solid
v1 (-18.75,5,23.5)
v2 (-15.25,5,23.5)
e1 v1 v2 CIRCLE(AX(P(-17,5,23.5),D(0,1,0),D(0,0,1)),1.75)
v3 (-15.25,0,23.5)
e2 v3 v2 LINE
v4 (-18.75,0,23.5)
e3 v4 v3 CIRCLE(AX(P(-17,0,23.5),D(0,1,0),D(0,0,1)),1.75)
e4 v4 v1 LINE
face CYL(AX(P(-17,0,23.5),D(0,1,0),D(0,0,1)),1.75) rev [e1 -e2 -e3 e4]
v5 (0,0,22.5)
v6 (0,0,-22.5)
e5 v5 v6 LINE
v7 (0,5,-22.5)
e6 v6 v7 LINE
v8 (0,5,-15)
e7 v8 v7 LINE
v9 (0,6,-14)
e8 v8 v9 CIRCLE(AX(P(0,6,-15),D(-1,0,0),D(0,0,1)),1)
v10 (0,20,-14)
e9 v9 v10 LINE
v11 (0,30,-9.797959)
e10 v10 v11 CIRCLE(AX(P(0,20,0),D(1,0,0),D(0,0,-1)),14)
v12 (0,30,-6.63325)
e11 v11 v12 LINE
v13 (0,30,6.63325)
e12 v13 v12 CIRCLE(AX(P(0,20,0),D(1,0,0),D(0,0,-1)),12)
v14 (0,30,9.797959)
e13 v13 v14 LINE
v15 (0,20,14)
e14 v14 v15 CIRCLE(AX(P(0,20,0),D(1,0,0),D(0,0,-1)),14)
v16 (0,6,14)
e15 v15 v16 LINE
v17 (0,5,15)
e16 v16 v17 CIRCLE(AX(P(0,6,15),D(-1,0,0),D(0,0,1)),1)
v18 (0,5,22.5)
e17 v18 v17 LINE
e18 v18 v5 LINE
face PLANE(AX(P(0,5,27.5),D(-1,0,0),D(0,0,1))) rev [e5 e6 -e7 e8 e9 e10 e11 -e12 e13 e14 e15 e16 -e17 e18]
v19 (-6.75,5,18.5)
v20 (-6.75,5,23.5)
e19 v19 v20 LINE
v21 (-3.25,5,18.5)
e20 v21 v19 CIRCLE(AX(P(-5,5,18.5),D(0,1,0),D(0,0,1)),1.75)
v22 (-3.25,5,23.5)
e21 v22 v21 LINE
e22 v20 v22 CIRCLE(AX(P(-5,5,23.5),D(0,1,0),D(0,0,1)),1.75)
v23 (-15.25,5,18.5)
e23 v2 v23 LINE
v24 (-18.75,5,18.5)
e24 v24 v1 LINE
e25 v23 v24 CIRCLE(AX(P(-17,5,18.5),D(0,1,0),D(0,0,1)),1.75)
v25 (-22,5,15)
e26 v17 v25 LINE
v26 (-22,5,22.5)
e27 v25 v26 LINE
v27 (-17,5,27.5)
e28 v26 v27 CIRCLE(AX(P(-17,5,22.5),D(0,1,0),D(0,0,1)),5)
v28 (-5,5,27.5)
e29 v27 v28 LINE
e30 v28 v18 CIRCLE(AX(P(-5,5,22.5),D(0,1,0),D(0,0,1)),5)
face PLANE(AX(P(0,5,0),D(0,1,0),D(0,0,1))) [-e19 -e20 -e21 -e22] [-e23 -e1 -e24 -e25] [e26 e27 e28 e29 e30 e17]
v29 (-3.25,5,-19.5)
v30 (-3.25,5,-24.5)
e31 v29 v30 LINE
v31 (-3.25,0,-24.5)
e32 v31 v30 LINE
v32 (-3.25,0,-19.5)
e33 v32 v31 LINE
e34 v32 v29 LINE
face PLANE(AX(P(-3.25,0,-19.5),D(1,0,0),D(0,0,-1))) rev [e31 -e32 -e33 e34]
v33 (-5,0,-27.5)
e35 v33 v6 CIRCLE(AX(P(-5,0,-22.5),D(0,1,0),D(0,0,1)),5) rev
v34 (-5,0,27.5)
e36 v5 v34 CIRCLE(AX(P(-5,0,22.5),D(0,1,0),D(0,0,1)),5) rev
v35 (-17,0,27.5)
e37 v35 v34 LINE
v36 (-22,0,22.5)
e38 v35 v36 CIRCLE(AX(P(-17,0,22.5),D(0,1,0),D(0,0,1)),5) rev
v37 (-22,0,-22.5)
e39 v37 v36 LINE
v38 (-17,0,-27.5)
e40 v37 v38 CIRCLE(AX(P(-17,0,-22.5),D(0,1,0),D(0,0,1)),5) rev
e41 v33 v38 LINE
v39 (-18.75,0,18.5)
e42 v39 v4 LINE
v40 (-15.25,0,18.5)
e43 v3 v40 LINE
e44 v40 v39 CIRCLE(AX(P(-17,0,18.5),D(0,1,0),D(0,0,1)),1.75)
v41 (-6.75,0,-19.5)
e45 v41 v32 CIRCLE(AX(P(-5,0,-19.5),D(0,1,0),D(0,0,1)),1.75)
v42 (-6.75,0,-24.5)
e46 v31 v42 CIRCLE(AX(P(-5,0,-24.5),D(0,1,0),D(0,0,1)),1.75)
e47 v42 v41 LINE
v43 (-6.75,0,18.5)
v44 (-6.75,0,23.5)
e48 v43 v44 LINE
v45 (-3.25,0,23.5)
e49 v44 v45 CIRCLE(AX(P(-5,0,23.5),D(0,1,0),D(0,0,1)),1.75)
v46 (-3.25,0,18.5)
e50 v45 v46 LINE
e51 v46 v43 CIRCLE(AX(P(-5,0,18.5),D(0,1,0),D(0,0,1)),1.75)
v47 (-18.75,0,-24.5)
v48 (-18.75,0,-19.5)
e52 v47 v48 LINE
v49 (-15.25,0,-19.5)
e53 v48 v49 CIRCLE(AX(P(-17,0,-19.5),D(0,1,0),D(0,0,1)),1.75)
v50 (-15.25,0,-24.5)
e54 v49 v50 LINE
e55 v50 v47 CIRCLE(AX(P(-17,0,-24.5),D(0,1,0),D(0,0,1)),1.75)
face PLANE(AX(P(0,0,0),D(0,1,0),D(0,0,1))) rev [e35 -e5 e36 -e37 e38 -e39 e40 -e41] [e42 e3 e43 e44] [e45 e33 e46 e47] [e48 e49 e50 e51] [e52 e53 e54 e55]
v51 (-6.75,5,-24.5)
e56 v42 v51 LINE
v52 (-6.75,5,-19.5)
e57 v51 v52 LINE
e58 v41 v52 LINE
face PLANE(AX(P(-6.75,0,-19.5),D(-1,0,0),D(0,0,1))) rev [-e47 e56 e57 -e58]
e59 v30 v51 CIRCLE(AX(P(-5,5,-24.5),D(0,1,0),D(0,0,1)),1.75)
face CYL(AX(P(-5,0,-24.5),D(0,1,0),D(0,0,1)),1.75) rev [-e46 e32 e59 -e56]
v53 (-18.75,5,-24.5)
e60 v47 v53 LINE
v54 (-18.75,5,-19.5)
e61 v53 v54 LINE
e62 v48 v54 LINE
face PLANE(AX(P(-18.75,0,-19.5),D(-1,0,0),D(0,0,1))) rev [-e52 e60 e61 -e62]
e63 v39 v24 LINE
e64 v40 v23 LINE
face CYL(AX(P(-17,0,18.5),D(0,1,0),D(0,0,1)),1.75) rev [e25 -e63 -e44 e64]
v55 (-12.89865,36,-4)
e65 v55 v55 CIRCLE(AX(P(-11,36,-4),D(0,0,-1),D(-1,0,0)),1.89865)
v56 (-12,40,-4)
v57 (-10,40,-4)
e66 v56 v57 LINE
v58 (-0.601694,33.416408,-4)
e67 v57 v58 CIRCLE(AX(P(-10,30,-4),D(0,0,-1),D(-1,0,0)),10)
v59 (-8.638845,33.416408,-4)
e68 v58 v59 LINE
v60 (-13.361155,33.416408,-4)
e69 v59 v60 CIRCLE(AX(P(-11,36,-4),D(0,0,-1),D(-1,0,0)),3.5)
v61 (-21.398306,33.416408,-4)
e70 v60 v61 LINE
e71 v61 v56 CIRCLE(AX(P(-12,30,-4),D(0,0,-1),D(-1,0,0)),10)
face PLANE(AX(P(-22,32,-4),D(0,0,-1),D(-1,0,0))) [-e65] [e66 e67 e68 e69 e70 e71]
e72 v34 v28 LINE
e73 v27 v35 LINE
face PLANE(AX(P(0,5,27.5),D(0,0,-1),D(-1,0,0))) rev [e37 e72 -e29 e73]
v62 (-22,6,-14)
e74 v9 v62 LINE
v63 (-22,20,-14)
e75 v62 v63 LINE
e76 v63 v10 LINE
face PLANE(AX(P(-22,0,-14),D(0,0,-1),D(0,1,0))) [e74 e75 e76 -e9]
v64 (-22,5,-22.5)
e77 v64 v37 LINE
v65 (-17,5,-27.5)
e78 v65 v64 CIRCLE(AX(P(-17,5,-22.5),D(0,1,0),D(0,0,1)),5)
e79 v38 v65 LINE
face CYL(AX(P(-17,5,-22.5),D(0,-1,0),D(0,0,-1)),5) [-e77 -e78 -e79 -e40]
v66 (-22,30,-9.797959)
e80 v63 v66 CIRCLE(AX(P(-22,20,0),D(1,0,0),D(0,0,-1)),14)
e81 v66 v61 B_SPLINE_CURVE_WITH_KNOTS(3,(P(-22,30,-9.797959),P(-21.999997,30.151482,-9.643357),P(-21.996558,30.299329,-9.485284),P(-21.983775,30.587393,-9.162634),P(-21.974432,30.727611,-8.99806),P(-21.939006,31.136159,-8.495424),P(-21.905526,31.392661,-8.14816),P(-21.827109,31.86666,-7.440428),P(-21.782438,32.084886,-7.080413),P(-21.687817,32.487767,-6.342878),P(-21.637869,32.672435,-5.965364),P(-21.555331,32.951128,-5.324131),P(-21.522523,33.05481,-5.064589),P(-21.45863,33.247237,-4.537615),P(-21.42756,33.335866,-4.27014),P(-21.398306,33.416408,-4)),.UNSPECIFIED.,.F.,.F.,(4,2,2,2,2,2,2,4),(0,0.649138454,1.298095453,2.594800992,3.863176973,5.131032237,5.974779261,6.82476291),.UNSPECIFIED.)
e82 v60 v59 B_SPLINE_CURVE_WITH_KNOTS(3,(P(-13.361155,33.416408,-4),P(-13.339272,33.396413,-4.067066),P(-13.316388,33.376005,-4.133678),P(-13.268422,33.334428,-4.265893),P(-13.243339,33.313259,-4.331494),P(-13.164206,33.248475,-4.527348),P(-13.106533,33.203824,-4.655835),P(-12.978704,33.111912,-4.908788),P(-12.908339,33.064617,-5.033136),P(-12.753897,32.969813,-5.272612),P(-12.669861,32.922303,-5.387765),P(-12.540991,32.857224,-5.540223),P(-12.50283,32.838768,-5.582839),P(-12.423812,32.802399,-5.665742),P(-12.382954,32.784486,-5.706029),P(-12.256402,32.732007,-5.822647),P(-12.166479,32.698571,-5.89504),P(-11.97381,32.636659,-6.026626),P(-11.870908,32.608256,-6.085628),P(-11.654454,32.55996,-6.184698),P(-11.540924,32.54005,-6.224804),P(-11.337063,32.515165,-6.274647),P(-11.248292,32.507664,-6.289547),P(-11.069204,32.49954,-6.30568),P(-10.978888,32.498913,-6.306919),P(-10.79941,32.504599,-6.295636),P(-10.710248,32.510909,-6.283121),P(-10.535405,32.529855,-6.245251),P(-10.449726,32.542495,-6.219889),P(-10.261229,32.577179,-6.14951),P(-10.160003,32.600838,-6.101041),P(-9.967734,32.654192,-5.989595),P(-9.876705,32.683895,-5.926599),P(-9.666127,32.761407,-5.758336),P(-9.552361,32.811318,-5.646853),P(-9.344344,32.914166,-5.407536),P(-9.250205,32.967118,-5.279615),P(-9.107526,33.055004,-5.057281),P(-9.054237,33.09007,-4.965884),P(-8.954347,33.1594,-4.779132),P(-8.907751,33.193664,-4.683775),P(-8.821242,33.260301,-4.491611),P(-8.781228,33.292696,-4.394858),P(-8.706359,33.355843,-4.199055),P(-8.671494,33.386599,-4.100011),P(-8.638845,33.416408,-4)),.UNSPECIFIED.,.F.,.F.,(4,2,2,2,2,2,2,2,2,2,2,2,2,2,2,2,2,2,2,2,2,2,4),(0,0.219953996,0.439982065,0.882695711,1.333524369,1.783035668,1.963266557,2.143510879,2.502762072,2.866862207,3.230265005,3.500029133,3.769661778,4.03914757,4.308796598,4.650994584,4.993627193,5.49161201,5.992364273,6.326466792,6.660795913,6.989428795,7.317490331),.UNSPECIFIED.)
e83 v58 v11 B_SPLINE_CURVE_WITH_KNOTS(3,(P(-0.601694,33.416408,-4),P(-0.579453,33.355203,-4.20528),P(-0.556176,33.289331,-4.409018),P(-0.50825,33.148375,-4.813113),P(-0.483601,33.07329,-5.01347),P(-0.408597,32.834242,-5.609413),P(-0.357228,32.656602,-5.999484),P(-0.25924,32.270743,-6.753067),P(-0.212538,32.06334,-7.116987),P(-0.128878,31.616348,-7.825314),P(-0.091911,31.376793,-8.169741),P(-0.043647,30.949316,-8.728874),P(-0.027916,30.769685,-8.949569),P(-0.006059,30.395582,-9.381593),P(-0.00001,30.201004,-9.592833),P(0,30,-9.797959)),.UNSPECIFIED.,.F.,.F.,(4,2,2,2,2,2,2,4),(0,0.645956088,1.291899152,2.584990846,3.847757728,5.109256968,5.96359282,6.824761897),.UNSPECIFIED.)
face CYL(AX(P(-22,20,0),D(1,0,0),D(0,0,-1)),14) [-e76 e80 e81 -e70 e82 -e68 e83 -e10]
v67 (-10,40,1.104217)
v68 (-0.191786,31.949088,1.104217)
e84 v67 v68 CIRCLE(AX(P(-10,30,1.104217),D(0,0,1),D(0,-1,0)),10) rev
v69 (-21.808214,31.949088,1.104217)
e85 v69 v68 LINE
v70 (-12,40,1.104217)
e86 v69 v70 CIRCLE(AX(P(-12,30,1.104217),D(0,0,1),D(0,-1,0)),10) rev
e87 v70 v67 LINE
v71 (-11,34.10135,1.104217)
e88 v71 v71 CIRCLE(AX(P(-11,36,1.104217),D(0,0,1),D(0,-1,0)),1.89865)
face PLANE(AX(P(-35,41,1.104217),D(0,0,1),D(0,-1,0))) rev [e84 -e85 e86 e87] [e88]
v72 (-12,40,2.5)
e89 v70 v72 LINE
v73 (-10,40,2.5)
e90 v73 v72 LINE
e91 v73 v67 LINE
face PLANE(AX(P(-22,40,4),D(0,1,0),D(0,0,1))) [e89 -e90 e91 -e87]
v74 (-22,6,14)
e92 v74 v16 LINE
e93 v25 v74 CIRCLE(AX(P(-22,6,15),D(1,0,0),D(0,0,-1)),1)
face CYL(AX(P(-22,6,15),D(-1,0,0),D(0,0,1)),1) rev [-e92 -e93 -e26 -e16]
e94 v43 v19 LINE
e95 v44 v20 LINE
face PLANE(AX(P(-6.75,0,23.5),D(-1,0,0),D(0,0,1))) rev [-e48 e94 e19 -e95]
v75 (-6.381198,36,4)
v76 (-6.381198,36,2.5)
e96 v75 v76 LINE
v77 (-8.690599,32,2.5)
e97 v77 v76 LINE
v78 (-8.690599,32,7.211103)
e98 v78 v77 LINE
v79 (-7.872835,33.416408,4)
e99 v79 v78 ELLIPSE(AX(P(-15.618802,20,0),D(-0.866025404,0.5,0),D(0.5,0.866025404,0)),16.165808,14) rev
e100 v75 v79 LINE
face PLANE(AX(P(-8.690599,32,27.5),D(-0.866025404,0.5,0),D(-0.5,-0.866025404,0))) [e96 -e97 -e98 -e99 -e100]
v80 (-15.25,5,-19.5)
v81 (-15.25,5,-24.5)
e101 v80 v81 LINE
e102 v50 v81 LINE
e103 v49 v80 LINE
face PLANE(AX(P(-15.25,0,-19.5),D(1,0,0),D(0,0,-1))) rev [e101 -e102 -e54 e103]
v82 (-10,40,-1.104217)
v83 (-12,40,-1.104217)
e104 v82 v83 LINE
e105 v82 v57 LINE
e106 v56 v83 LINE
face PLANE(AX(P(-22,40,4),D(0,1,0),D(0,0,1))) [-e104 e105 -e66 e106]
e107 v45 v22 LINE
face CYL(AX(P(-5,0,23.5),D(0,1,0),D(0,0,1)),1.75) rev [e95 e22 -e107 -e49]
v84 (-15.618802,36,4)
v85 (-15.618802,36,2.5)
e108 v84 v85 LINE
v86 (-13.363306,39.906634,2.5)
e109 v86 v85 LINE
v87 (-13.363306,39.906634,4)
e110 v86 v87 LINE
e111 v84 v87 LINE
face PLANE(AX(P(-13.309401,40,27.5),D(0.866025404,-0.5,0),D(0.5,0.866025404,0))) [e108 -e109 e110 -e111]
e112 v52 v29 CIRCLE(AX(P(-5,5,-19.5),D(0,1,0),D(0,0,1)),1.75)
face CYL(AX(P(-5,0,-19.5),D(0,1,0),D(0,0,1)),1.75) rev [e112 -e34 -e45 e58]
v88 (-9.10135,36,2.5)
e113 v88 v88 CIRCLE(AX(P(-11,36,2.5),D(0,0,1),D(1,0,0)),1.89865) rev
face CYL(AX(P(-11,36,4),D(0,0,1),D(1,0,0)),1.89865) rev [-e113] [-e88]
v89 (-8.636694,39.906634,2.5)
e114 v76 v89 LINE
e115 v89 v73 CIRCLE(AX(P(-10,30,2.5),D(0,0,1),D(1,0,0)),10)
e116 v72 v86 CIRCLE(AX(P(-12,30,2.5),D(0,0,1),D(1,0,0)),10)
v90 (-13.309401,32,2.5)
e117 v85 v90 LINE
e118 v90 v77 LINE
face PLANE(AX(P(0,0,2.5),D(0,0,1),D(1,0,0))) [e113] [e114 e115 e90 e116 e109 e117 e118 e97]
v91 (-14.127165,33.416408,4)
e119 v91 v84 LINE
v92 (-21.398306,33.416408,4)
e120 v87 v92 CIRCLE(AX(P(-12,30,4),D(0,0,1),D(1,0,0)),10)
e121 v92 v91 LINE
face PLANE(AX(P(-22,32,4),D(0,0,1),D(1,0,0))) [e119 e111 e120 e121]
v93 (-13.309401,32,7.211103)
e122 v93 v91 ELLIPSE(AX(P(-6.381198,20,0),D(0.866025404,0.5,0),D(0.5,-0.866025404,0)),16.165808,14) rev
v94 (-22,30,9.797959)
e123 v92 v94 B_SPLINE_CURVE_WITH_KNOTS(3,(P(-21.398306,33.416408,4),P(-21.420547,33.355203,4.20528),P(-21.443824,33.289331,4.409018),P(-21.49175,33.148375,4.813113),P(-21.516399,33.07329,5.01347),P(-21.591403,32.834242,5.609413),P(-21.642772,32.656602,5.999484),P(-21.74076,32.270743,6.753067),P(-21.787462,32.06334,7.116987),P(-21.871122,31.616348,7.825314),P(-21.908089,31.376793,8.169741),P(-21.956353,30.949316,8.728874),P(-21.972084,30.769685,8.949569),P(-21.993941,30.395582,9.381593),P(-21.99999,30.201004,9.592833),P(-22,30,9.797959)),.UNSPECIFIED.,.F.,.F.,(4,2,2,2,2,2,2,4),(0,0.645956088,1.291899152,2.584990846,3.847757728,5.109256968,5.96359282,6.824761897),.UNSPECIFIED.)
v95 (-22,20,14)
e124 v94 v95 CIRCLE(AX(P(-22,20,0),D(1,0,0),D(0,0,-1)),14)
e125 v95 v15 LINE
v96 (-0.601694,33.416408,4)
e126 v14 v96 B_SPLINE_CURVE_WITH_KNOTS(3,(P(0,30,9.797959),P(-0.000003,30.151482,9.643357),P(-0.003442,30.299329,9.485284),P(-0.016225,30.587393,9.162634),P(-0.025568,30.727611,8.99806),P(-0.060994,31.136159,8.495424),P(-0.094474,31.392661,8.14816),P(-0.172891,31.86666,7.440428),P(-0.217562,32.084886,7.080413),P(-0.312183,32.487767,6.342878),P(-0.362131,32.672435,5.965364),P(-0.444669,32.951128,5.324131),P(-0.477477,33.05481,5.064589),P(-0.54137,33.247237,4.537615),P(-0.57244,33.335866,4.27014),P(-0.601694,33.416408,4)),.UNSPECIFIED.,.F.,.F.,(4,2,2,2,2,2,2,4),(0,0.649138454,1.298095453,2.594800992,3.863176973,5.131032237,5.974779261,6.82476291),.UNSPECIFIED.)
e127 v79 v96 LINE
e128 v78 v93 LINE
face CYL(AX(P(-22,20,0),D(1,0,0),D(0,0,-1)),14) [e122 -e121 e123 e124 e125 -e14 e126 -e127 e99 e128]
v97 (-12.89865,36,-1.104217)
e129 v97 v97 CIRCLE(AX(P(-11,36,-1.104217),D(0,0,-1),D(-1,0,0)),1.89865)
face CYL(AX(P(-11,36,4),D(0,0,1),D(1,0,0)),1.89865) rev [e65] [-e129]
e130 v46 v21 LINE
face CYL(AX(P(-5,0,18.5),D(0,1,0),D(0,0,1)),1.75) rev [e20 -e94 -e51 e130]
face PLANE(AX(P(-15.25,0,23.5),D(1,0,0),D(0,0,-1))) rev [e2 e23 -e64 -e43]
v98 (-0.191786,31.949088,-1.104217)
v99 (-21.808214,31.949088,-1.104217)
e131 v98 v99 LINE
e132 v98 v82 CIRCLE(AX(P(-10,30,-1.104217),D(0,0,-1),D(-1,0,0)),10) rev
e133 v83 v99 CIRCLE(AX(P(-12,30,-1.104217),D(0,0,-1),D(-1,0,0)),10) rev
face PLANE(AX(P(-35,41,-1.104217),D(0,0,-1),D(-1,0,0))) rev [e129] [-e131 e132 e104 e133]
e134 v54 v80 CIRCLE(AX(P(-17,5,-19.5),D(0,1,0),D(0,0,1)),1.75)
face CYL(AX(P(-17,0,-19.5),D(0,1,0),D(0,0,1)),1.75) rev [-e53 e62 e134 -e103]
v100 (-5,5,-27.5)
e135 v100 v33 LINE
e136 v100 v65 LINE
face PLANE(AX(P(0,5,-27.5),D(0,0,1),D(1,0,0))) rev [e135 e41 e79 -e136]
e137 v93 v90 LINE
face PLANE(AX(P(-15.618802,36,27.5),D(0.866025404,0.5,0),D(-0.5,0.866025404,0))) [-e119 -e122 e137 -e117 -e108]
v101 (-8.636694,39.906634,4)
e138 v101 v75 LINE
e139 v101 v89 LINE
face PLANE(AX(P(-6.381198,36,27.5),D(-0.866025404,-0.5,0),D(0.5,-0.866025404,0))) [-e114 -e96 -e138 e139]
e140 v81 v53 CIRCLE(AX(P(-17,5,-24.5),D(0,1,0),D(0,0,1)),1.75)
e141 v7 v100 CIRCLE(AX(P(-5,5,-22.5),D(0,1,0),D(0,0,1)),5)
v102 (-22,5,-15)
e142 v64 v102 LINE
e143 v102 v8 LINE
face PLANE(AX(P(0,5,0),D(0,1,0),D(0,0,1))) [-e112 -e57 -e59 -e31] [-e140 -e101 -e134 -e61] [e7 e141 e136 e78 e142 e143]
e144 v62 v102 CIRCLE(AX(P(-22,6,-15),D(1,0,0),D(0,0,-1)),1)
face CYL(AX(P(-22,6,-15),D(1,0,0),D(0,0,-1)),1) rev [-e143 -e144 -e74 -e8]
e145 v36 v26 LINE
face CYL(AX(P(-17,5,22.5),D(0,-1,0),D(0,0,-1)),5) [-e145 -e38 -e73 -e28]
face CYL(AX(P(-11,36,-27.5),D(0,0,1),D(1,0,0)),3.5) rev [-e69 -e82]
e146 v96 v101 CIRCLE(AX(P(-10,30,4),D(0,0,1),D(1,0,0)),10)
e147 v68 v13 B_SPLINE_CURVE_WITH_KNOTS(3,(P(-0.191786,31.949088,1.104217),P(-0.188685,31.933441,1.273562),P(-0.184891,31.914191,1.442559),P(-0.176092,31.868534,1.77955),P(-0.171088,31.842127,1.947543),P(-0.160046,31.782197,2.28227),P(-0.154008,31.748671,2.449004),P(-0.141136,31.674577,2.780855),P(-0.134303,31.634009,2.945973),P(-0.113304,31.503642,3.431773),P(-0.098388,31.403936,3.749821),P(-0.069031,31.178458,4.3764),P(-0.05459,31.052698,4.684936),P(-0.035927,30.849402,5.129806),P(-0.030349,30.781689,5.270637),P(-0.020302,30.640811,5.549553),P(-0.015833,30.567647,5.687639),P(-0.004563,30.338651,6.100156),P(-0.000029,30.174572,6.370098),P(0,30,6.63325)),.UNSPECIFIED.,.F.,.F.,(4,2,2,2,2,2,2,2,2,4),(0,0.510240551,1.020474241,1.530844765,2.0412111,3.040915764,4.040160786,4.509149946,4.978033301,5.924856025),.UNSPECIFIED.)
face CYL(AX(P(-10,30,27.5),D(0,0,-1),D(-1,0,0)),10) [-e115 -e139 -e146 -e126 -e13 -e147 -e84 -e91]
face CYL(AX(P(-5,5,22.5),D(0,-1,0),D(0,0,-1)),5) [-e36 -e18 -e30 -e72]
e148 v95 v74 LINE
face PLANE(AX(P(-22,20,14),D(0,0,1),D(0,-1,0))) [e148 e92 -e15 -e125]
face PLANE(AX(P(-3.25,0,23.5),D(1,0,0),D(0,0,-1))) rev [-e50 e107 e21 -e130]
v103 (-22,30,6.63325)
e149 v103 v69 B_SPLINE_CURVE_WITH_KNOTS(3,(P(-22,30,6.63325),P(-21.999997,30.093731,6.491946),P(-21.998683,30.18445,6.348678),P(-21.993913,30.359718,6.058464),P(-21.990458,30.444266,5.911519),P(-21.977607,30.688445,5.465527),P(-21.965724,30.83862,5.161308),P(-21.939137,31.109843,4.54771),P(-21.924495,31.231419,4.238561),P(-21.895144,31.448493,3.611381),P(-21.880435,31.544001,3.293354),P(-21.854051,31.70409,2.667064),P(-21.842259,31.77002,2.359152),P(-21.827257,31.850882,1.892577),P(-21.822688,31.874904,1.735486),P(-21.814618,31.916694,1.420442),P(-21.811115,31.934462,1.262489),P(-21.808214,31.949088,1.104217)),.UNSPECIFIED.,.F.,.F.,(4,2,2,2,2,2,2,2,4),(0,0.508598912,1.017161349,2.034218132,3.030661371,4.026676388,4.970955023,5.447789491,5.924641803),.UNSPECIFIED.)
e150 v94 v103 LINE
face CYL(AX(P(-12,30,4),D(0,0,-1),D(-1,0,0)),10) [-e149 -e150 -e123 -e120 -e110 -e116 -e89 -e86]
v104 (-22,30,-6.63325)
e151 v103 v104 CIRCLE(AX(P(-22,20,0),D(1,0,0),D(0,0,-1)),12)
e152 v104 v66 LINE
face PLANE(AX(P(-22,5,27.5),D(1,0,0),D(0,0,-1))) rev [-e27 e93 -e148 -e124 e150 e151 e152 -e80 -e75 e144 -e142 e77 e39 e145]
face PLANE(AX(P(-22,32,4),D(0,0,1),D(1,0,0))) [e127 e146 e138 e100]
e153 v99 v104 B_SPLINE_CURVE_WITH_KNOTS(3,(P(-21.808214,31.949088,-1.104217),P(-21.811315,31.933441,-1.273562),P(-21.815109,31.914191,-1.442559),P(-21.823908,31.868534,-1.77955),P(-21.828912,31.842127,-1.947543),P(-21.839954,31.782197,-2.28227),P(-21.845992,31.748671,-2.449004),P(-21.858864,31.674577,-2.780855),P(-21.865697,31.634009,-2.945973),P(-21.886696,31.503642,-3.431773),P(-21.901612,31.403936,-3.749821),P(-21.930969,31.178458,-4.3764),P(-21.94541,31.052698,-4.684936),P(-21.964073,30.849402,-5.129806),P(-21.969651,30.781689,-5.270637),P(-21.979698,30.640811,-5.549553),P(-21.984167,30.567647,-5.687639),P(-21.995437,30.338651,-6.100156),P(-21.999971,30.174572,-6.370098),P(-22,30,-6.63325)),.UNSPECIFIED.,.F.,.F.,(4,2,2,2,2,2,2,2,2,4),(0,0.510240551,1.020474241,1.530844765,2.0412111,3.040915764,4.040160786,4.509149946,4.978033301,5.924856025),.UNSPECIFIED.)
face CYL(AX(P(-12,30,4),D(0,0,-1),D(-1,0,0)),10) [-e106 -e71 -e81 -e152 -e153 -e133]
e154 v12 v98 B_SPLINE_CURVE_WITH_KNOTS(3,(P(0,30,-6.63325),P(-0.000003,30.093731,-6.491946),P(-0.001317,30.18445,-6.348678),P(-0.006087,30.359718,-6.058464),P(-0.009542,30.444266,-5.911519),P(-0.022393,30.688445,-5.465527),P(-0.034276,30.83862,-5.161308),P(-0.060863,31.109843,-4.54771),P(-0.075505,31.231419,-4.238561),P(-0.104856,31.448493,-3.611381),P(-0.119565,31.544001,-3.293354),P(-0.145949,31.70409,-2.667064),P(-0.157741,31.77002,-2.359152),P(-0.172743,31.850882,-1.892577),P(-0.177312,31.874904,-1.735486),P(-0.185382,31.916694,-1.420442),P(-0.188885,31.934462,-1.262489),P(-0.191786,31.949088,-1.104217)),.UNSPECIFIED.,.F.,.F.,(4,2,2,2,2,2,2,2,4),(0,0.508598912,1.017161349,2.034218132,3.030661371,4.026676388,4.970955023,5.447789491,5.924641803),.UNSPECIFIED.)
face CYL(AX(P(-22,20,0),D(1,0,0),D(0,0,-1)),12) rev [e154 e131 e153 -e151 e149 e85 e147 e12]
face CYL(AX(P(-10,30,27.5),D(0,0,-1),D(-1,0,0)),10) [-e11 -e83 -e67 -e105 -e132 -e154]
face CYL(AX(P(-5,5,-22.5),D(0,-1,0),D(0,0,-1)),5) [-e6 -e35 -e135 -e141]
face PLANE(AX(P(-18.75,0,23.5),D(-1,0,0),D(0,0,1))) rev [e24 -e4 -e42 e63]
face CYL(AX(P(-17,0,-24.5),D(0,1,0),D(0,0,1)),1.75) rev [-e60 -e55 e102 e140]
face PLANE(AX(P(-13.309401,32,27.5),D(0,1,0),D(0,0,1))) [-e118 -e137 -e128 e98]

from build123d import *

# Parameters (mm, degrees)
SKETCH1_W             = 22
SKETCH1_H             = 55
BASE_DEPTH            = 5
SKETCH2_R             = 12
MOTOR_SUPPORT_DEPTH   = 22
SKETCH3_W             = 8
SKETCH3_H             = 8
CLAMP_FLANGE_DEPTH    = 22
SKETCH4_W             = 2.208433096
SKETCH4_H             = 15
SLOT_DEPTH            = 35
F_6_CLEARANCE_HOLE1_D = 3.7973
HEX_CUT_DEPTH         = 56.463952257
HEX_CUT_DEPTH_BACK    = 1.5
SKETCH9_R             = 3.5
SCREW_HEAD_CUT_DEPTH  = 56.463952257
MOUNTING_SLOT_DEPTH   = 50.651284016
LPATTERN1_COUNT       = 2
LPATTERN1_PITCH       = 12
LPATTERN1_COUNT_DIR2  = 2
LPATTERN1_PITCH_DIR2  = 43
FILLET2_R             = 5
FILLET3_R             = 1
FILLET4_R             = 10


with BuildPart() as part:
    # Sketch1 → Base (new body)
    with BuildSketch(Plane(origin=(0, 0, 0), x_dir=(1, 0, 0), z_dir=(0, 1, 0))):
        with Locations((-11, 0)):
            Rectangle(SKETCH1_W, SKETCH1_H)
    extrude(amount=BASE_DEPTH)

    # Sketch2 → Motor Support (add)
    with BuildSketch(Plane(origin=(0, 0, 0), x_dir=(0, 0, -1), z_dir=(1, 0, 0))):
        with BuildLine():
            Line((-14, 20), (-14, 0))
            Line((-14, 0), (14, 0))
            Line((14, 0), (14, 20))
            ThreePointArc((14, 20), (0, 34), (-14, 20))
        make_face()
        with Locations((0, 20)):
            Circle(SKETCH2_R, mode=Mode.SUBTRACT)
    extrude(amount=-MOTOR_SUPPORT_DEPTH)

    # Sketch3 → Clamp Flange (add)
    with BuildSketch(Plane(origin=(0, 0, 0), x_dir=(0, 0, -1), z_dir=(1, 0, 0))):
        with Locations((0, 36)):
            Rectangle(SKETCH3_W, SKETCH3_H)
    extrude(amount=-CLAMP_FLANGE_DEPTH)

    # Sketch4 → Slot (cut)
    with BuildSketch(Plane(origin=(0, 0, 0), x_dir=(0, 0, -1), z_dir=(1, 0, 0))):
        with Locations((0, 33.5)):
            Rectangle(SKETCH4_W, SKETCH4_H)
    extrude(amount=-SLOT_DEPTH, mode=Mode.SUBTRACT)

    # #6 Clearance Hole1 (through all)
    with Locations(Plane.XY.offset(4)):
        with Locations((-11, 36)):
            Hole(F_6_CLEARANCE_HOLE1_D / 2)

    # Sketch7 → Hex-Cut (cut, two sides: drawn at the far end of the back side and taken through both)
    with BuildSketch(Plane.XY.offset(4).offset(-HEX_CUT_DEPTH_BACK)):
        Polygon((-8.690598923, 40), (-13.309401077, 40), (-15.618802154, 36), (-13.309401077, 32), (-8.690598923, 32), (-6.381197846, 36), align=None)
    extrude(amount=HEX_CUT_DEPTH + HEX_CUT_DEPTH_BACK, mode=Mode.SUBTRACT)

    # Sketch9 → Screw Head Cut (cut, through all)
    with BuildSketch(Plane(origin=(0, 0, -4), x_dir=(-1, 0, 0), z_dir=(0, 0, -1))):
        with Locations((11, 36)):
            Circle(SKETCH9_R)
    extrude(amount=SCREW_HEAD_CUT_DEPTH, mode=Mode.SUBTRACT)

    # Sketch8 → Mounting Slot (cut, through all)
    with BuildSketch(Plane(origin=(0, 5, 0), x_dir=(1, 0, 0), z_dir=(0, 1, 0))):
        with BuildLine():
            Line((-18.75, 19.5), (-18.75, 24.5))
            ThreePointArc((-18.75, 24.5), (-17, 26.25), (-15.25, 24.5))
            Line((-15.25, 24.5), (-15.25, 19.5))
            ThreePointArc((-15.25, 19.5), (-17, 17.75), (-18.75, 19.5))
        make_face()
    mounting_slot = extrude(amount=-MOUNTING_SLOT_DEPTH, mode=Mode.SUBTRACT)

    # LPattern1: Mounting Slot 2 × 2
    with Locations(*[(i * LPATTERN1_PITCH, 0, j * LPATTERN1_PITCH_DIR2) for i in range(LPATTERN1_COUNT) for j in range(LPATTERN1_COUNT_DIR2) if (i, j) != (0, 0)]):
        add(mounting_slot, mode=Mode.SUBTRACT)

    # Fillet2
    fillet2_edges = [part.edges().sort_by_distance(p)[0] for p in [
        (0, 2.5, 27.5),
        (-22, 2.5, 27.5),
        (-22, 2.5, -27.5),
        (0, 2.5, -27.5),
    ]]
    fillet(fillet2_edges, radius=FILLET2_R)

    # Fillet3
    fillet3_edges = [part.edges().sort_by_distance(p)[0] for p in [
        (-11, 5, -14),
        (-11, 5, 14),
    ]]
    fillet(fillet3_edges, radius=FILLET3_R)

    # Fillet4
    # the kernel refuses this fillet: 10 mm, written as the material it takes off along each edge
    with BuildSketch(Plane(origin=(0, 40, -29), x_dir=(0, -1, 0), z_dir=(0, 0, 1)), Plane(origin=(0, 40, -23.895783452), x_dir=(0, -1, 0), z_dir=(0, 0, 1))) as fillet4_piece_1:
        with BuildLine():
            CenterArc((FILLET4_R, -FILLET4_R), FILLET4_R, 90, 90)
            Line((0, -FILLET4_R), (0, 0))
            Line((0, 0), (FILLET4_R, 0))
        make_face()
    extrude(amount=52.895783452, mode=Mode.SUBTRACT)
    with BuildSketch(Plane(origin=(-22, 40, -29), x_dir=(0, -1, 0), z_dir=(0, 0, 1)), Plane(origin=(-22, 40, -23.895783452), x_dir=(0, -1, 0), z_dir=(0, 0, 1))) as fillet4_piece_2:
        with BuildLine():
            CenterArc((FILLET4_R, FILLET4_R), FILLET4_R, 180, 90)
            Line((0, FILLET4_R), (0, 0))
            Line((0, 0), (FILLET4_R, 0))
        make_face()
    extrude(amount=52.895783452, mode=Mode.SUBTRACT)


solid = part.part
